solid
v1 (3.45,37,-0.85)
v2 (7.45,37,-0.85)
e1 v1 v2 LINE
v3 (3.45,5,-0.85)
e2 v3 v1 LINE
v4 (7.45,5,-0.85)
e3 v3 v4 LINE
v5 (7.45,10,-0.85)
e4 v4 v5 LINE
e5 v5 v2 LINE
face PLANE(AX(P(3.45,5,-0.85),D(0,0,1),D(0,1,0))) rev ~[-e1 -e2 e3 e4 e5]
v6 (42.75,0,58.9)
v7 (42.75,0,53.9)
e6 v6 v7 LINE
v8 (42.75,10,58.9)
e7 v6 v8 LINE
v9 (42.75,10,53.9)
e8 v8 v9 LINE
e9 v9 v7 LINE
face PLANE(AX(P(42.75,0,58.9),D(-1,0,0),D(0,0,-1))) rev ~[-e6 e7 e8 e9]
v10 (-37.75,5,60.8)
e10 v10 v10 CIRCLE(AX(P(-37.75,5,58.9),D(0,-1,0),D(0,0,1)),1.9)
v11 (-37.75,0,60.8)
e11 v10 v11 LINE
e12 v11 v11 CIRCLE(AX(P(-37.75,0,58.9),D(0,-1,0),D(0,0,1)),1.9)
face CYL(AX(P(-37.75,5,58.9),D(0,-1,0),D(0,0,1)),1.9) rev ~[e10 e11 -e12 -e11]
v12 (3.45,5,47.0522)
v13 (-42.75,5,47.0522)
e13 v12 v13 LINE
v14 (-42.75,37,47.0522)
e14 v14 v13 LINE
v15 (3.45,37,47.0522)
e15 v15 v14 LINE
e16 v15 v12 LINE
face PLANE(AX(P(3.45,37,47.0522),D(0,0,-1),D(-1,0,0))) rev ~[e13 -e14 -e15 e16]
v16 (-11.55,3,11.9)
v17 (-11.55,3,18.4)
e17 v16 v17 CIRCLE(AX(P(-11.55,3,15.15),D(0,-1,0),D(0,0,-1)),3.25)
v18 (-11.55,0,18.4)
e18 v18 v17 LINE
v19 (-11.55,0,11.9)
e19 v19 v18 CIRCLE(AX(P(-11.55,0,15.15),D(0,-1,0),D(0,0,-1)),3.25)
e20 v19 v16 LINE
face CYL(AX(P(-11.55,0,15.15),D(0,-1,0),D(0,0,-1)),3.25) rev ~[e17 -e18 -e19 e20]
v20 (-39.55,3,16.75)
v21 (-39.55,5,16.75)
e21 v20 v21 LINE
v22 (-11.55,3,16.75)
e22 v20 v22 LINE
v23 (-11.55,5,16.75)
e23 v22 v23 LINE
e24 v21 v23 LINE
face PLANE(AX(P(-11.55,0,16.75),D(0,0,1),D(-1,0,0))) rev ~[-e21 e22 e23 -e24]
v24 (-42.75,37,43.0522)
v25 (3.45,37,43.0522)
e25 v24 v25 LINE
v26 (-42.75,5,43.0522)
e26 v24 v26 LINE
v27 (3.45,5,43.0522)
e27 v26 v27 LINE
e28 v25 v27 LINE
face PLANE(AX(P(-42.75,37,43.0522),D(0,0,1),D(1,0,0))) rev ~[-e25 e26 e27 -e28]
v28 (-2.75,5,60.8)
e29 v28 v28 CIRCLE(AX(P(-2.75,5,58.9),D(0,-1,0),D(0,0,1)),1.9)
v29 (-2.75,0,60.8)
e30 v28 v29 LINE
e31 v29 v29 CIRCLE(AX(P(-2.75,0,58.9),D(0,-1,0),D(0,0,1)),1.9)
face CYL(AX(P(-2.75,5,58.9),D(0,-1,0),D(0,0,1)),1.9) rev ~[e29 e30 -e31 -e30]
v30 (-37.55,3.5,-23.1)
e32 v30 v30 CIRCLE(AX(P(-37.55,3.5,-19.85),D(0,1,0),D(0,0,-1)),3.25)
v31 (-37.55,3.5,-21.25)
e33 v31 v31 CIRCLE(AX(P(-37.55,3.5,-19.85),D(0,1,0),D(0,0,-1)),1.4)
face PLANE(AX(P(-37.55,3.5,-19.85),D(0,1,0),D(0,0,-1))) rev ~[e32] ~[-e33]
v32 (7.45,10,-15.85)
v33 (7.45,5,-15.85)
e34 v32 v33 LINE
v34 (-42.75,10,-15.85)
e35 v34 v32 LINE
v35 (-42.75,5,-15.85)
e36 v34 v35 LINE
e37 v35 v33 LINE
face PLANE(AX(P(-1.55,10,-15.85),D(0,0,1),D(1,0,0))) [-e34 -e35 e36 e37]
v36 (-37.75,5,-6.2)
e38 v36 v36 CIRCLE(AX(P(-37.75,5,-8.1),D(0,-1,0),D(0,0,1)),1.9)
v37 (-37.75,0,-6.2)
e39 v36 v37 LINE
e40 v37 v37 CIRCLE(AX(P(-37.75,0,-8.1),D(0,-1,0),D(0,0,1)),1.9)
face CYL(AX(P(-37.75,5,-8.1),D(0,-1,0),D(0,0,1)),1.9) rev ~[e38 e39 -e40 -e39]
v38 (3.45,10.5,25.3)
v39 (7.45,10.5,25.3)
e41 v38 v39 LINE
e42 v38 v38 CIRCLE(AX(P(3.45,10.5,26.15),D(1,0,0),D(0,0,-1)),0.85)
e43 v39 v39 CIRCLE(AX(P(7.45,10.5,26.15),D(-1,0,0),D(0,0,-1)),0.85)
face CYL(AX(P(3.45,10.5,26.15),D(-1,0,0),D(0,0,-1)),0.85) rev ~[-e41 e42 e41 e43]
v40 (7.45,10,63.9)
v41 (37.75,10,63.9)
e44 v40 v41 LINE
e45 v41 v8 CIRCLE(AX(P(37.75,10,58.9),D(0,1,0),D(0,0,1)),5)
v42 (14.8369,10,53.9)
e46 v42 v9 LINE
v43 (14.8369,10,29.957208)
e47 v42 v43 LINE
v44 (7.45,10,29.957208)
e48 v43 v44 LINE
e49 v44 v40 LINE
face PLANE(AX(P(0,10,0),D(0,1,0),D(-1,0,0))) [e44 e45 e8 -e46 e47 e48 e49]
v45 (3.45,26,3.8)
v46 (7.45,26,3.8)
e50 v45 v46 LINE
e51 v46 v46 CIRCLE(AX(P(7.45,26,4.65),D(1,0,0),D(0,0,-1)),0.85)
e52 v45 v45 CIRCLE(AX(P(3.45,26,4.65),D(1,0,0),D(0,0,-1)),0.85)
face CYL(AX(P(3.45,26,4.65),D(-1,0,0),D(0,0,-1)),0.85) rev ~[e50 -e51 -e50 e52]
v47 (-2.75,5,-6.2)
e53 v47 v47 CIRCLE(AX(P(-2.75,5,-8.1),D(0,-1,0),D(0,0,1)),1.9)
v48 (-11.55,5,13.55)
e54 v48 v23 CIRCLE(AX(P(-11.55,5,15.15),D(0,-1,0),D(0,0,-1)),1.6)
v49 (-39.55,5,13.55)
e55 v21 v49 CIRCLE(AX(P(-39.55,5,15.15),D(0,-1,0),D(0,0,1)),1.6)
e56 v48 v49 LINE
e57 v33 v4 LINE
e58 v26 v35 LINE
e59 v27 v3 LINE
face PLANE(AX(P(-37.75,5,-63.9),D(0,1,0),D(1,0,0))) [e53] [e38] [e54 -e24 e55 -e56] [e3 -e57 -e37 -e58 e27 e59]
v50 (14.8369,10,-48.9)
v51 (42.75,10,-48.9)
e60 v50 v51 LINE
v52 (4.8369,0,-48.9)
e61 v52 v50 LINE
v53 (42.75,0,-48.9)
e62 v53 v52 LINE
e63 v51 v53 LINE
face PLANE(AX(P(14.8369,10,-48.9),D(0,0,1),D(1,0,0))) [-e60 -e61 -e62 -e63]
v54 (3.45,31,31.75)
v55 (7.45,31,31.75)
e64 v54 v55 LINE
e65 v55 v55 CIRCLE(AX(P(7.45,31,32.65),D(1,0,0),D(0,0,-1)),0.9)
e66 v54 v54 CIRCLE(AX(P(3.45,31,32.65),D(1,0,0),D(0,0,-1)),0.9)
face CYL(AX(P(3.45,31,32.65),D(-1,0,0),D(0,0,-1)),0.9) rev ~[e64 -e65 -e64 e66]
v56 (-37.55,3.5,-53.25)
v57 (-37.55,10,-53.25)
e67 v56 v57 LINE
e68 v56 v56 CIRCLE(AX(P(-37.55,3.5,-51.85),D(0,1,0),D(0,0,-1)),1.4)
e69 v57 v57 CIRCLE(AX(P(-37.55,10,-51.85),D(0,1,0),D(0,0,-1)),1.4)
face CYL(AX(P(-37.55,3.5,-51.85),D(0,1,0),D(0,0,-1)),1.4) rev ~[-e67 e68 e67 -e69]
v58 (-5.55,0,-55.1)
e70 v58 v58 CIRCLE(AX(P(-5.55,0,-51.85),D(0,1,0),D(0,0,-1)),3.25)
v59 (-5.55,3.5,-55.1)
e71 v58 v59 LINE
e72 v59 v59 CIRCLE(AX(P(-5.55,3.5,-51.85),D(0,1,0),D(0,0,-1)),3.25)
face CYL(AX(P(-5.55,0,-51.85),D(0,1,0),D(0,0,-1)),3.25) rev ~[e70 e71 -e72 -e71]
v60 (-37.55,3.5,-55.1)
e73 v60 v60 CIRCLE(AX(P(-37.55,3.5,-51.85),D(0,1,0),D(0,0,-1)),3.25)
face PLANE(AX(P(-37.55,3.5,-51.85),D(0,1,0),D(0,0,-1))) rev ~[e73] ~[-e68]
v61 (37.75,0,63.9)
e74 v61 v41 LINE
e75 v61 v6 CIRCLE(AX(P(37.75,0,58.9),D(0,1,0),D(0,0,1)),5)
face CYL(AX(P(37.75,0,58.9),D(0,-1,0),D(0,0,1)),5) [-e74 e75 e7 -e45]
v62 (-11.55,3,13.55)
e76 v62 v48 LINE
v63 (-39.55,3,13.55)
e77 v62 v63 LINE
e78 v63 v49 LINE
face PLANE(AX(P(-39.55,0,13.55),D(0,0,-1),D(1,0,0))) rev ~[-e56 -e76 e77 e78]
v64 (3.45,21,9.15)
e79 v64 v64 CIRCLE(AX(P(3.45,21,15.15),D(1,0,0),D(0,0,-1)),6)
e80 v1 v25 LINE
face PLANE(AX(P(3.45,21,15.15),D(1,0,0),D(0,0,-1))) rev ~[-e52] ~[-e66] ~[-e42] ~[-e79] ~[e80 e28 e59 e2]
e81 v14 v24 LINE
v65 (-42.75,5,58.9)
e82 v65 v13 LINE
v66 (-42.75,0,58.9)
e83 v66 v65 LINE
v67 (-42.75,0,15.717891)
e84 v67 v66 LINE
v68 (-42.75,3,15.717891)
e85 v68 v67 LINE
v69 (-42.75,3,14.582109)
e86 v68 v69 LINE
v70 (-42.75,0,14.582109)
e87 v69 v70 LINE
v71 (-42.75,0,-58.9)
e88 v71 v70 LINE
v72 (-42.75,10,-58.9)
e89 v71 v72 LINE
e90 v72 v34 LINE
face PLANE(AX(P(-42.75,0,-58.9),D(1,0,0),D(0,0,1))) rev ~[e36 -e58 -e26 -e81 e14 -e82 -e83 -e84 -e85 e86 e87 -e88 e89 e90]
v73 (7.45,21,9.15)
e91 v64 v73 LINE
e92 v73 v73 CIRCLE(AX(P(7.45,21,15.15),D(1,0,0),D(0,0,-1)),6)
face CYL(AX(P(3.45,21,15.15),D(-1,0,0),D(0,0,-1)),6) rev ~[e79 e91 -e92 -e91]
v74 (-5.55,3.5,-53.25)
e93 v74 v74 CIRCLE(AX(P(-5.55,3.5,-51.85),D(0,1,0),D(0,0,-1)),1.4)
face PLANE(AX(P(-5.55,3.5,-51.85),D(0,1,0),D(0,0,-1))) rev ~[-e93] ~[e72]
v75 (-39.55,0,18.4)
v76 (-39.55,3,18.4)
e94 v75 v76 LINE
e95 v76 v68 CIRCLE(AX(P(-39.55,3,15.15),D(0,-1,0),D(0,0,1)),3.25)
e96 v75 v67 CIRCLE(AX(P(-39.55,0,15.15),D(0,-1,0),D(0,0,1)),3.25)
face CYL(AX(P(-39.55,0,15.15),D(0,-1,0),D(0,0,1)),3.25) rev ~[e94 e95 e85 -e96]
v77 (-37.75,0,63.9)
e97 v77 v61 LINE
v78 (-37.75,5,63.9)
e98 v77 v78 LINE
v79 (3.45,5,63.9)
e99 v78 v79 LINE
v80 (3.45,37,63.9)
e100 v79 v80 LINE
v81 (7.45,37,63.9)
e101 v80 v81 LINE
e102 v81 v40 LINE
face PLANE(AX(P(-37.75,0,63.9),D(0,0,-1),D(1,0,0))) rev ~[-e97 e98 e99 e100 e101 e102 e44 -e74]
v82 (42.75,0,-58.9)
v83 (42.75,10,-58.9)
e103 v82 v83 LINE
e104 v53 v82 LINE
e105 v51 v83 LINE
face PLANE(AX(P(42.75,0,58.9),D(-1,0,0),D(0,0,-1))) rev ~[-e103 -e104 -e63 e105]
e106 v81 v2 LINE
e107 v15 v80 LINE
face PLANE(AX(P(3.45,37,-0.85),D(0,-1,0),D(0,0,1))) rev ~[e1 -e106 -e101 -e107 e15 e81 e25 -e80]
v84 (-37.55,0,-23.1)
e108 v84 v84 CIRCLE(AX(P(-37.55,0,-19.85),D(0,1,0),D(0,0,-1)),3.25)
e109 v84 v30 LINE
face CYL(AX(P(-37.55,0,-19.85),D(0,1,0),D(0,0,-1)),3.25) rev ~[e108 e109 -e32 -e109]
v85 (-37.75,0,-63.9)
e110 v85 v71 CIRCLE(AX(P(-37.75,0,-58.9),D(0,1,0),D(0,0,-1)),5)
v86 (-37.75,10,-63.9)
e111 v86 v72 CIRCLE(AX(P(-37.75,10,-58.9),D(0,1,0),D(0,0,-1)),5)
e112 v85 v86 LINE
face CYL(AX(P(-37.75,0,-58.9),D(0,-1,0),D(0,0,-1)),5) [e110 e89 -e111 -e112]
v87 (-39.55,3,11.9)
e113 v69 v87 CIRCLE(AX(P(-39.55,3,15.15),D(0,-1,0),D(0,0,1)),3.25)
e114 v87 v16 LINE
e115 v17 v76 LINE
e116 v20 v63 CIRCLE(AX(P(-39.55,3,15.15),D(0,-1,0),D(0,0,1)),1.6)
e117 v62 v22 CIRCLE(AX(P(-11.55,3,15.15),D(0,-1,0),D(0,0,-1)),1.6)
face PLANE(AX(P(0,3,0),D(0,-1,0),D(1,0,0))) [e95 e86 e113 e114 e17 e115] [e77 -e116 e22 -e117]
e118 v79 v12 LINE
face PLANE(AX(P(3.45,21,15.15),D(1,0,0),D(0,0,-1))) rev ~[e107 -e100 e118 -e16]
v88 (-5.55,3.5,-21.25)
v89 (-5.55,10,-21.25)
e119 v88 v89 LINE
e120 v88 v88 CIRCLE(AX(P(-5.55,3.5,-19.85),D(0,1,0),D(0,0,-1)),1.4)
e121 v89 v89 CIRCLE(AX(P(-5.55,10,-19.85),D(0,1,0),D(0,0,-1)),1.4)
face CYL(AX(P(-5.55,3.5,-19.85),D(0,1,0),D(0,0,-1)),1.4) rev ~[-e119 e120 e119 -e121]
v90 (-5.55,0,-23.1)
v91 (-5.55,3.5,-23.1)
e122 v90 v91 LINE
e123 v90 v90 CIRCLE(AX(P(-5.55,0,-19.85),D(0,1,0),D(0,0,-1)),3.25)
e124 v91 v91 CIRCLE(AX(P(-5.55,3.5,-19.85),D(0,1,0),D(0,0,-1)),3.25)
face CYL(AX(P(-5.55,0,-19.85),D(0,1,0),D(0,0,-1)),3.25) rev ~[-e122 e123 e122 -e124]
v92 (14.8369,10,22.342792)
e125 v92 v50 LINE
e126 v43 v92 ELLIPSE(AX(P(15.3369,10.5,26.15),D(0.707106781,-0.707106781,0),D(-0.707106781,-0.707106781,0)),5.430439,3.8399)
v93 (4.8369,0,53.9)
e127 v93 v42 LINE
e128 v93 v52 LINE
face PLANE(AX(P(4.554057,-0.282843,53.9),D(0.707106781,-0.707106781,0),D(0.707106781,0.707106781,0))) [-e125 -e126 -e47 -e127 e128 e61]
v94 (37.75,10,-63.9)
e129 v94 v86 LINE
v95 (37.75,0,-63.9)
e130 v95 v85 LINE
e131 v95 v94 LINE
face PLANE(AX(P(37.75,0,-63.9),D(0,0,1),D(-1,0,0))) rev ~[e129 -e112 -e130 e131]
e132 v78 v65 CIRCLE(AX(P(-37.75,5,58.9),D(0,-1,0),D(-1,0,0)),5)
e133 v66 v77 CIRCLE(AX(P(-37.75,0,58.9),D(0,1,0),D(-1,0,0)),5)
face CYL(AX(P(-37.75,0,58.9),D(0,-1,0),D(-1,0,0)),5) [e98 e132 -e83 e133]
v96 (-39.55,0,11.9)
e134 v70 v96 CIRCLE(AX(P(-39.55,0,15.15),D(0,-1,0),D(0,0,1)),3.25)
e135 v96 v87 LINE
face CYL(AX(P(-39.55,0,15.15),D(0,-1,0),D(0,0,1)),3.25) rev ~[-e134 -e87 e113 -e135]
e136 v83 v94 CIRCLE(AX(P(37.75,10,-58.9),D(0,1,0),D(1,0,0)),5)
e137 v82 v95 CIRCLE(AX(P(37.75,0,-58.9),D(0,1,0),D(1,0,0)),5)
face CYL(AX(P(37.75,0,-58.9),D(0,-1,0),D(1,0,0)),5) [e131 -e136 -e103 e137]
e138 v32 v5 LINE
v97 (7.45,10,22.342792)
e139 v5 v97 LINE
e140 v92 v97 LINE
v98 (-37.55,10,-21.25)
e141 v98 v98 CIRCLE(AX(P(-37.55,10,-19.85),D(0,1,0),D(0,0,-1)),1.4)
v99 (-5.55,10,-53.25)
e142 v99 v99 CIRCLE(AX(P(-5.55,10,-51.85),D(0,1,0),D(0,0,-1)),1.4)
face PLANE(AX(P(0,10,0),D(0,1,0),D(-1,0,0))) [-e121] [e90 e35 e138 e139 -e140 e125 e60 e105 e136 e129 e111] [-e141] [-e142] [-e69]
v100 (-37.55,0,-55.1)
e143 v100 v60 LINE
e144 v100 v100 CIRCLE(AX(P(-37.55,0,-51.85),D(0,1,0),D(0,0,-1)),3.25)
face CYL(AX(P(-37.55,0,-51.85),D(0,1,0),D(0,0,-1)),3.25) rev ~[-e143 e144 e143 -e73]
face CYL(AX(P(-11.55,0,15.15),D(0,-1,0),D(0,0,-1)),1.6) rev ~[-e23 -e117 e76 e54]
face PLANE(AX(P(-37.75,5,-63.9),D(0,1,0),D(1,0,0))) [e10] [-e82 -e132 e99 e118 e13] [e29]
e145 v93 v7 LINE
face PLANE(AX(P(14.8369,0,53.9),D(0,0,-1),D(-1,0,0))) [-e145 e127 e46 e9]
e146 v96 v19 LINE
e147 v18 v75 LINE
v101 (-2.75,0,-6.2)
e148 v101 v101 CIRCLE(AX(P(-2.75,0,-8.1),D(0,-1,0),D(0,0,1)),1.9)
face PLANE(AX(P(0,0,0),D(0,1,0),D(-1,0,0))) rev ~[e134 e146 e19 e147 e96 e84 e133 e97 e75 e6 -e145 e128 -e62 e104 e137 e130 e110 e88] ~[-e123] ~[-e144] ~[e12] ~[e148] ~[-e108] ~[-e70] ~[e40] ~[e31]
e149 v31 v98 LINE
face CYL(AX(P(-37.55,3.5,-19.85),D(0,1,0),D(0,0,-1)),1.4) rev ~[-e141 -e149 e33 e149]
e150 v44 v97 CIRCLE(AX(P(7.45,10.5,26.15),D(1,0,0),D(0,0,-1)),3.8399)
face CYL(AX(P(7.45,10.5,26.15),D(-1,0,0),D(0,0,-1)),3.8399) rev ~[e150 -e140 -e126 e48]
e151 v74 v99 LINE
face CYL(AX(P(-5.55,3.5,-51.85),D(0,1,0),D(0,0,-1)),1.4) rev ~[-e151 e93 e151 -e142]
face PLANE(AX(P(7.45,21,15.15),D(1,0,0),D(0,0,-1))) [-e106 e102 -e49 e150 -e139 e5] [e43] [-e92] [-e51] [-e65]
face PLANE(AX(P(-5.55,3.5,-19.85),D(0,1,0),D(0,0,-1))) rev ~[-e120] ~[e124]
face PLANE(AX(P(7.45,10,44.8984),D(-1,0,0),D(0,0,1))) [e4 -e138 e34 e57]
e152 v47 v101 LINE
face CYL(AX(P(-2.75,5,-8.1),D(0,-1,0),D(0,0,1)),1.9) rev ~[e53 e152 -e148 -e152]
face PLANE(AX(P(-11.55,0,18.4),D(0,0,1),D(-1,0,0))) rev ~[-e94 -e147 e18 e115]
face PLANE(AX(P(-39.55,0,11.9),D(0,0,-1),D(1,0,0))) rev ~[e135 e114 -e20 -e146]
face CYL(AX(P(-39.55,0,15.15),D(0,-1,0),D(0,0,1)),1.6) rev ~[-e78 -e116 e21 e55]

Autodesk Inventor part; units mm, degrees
ref_plane "Arbeitsebene4" through (-41.55, 10, -74.35) normal (0, -1, 0) x (1, 0, 0)
sketch "Skizze1" plane through (0, 0, 0) normal (0, 1, 0) x (-1, 0, 0)
  line L0 (-37.75, -63.9) -> (37.75, -63.9)
  line L1 (42.75, -58.9) -> (42.75, 58.9)
  line L2 (37.75, 63.9) -> (-37.75, 63.9)
  line L3 (-42.75, 58.9) -> (-42.75, -58.9)
  line L4 (-42.75, -63.9) -> (42.75, 63.9) construction
  line L5 (42.75, -63.9) -> (-42.75, 63.9) construction
  arc A0 (42.75, 58.9) -> (37.75, 63.9) centre (37.75, 58.9) ccw
  arc A1 (-37.75, 63.9) -> (-42.75, 58.9) centre (-37.75, 58.9) ccw
  arc A2 (-42.75, -58.9) -> (-37.75, -63.9) centre (-37.75, -58.9) ccw
  arc A3 (37.75, -63.9) -> (42.75, -58.9) centre (37.75, -58.9) ccw
  point P0 (0, 0)
  dimension "d0" = 85.5
  dimension "d1" = 127.8
  dimension "d2" = 5
extrude "Extrusion1" add sketch "Skizze1" along normal up to surface (10 mm away)
ref_plane "Arbeitsebene1" through (37.75, 0, 0) normal (0, 0, -1) x (-1, 0, 0)
ref_plane "Arbeitsebene2" through (0, 0, 58.9) normal (1, 0, 0) x (0, 0, -1)
sketch "Skizze10" plane through (0, 0, 0) normal (0, -1, 0) x (1, 0, 0)
  circle A0 centre (-37.55, -51.85) radius 1.75 projected
  circle A1 centre (-37.55, -19.85) radius 1.75 projected
  circle A2 centre (-5.55, -51.85) radius 1.75 projected
  circle A3 centre (-5.55, -19.85) radius 1.75 projected
  circle A4 centre (-37.55, -51.85) radius 1.4
  point P0 (0, 0)
  dimension "d37" = 2.8
hole "Bohrung2" at (-37.55, 0, -51.85) at (-37.55, 0, -19.85) at (-5.55, 0, -19.85) at (-5.55, 0, -51.85) direction (0, 1, 0) diameter 2.8 end through all counterbore diameter 6.5 counterbore depth 3.5
sketch "Skizze11" plane through (-37.75, 10, -63.9) normal (0, 1, 0) x (1, 0, 0)
  line L0 (-6.8, -63.05) -> (41.2, -63.05) projected
  line L1 (-6.8, -95.05) -> (41.2, -95.05) projected
  line L2 (-3.8, -48.05) -> (36.2, -48.05) projected
  line L3 (-5, -5) -> (-5, -122.8) projected
  line L4 (0, -127.8) -> (75.5, -127.8) projected
  line L5 (-5, -48.05) -> (45.2, -48.05)
  line L6 (45.2, -48.05) -> (45.2, -127.8)
  line L7 (45.2, -127.8) -> (-5, -127.8)
  line L8 (-5, -127.8) -> (-5, -48.05)
  line L9 (45.2, -108.7984) -> (45.2, -60.5539)
  line L10 (80.5, -82.3) -> (60.5, -82.3) construction
  line L11 (60.5, -82.3) -> (60.5, -82.05) construction
  line L12 (60.5, -82.05) -> (60.5, -81.8) construction
  line L13 (60.5, -81.8) -> (60.5, -81.55) construction
  line L14 (60.5, -81.55) -> (60.5, -81.3) construction
  line L15 (60.5, -81.3) -> (60.5, -81.05) construction
  line L16 (60.5, -81.05) -> (60.5, -80.8) construction
  line L17 (60.5, -80.8) -> (60.5, -80.55) construction
  line L18 (60.5, -80.55) -> (60.5, -80.3) construction
  line L19 (60.5, -80.3) -> (60.5, -80.05) construction
  line L20 (60.5, -80.05) -> (60.5, -79.8) construction
  line L21 (60.5, -79.8) -> (60.5, -79.55) construction
  line L22 (60.5, -79.55) -> (60.5, -79.3) construction
  line L23 (60.5, -79.3) -> (60.5, -79.05) construction
  line L24 (60.5, -79.05) -> (60.5, -78.8) construction
  line L25 (60.5, -78.8) -> (60.5, -78.55) construction
  line L26 (60.5, -78.55) -> (60.5, -78.3) construction
  line L27 (60.5, -78.3) -> (60.5, -78.05) construction
  line L28 (60.5, -78.05) -> (60.5, -77.8) construction
  line L29 (60.5, -77.8) -> (60.5, -77.55) construction
  line L30 (60.5, -77.55) -> (60.5, -77.3) construction
  line L31 (60.5, -77.3) -> (80.5, -77.3) construction
  line L32 (80.5, -77.3) -> (80.5, -41.8) construction
  line L33 (80.5, -41.8) -> (54.7, -41.8) construction
  line L34 (54.7, -41.8) -> (54.7, -117.8) construction
  line L35 (54.7, -117.8) -> (80.5, -117.8) construction
  line L36 (80.5, -117.8) -> (80.5, -82.3) construction
  point P0 (37.75, -63.9)
  dimension "d45" = 0
ref_plane "Arbeitsebene5" through (-44.55, 5, -0.85) normal (0, -1, 0) x (1, 0, 0)
extrude "Extrusion9" cut sketch "Skizze11" against normal up to surface (5 mm away)
sketch "Skizze12" plane through (0, 0, 0) normal (0, -1, 0) x (1, 0, 0)
  circle A0 centre (-39.55, 15.15) radius 1.4 projected
  circle A1 centre (-11.55, 15.15) radius 1.4 projected
  line L0 (-11.55, 15.15) -> (-39.55, 15.15) construction
  line L1 (-11.55, 16.75) -> (-39.55, 16.75)
  line L2 (-39.55, 13.55) -> (-11.55, 13.55)
  arc A2 (-11.55, 13.55) -> (-11.55, 16.75) centre (-11.55, 15.15) ccw
  arc A3 (-39.55, 16.75) -> (-39.55, 13.55) centre (-39.55, 15.15) ccw
  point P0 (0, 0)
  point P1 (-25.55, 15.15)
  dimension "d48" = 3.2
extrude "Extrusion10" cut sketch "Skizze12" against normal blind 10 contours A0 | A1 | A2 L2 A3 L1
sketch "Skizze13" plane through (0, 0, 0) normal (0, -1, 0) x (1, 0, 0)
  line L0 (-44.55, 31.15) -> (3.45, 31.15) projected
  line L1 (-11.55, 13.55) -> (-39.55, 13.55) projected
  arc A0 (-39.55, 16.75) -> (-39.55, 13.55) centre (-39.55, 15.15) ccw projected
  line L2 (-39.55, 16.75) -> (-11.55, 16.75) projected
  arc A1 (-11.55, 13.55) -> (-11.55, 16.75) centre (-11.55, 15.15) ccw projected
  arc A2 (-42.75, -58.9) -> (-37.75, -63.9) centre (-37.75, -58.9) ccw projected
  line L3 (37.75, -63.9) -> (-37.75, -63.9) projected
  arc A3 (37.75, -63.9) -> (42.75, -58.9) centre (37.75, -58.9) ccw projected
  line L4 (42.75, 58.9) -> (42.75, -58.9) projected
  arc A4 (42.75, 58.9) -> (37.75, 63.9) centre (37.75, 58.9) ccw projected
  line L5 (-37.75, 63.9) -> (37.75, 63.9) projected
  arc A5 (-37.75, 63.9) -> (-42.75, 58.9) centre (-37.75, 58.9) ccw projected
  line L6 (-42.75, -58.9) -> (-42.75, 58.9) projected
  line L7 (-11.55, 18.4) -> (-39.55, 18.4)
  arc A6 (-39.55, 18.4) -> (-39.55, 11.9) centre (-39.55, 15.15) ccw
  line L8 (-39.55, 11.9) -> (-11.55, 11.9)
  arc A7 (-11.55, 11.9) -> (-11.55, 18.4) centre (-11.55, 15.15) ccw
  point P0 (0, 0)
  dimension "d51" = 6.5
extrude "Extrusion11" cut sketch "Skizze13" against normal blind 3 contours L1 A0 L2 A1 | A6 L6 | L6 A6 L7 A7 L8
ref_plane "Arbeitsebene6" through (3.45, 21, 15.15) normal (1, 0, 0) x (0, 0, -1)
sketch "Skizze14" plane through (3.45, 21, 15.15) normal (1, 0, 0) x (0, 0, -1)
  line L0 (16, 16) -> (14, 16) projected
  line L1 (16, -16) -> (16, 16) projected
  line L2 (-16, 16) -> (-16, -16) projected
  circle A0 centre (-17.5, 10) radius 1 construction
  circle A1 centre (-11, -10.5) radius 1 construction
  line L3 (9.4, -16) -> (6.6, -16) projected
  circle A2 centre (10.5, 5) radius 1 construction
  circle A3 centre (0, 0) radius 6 projected
  line L4 (-48.75, -21) -> (-48.75, -11) projected
  line L5 (16, 16) -> (-48.75, 16)
  line L6 (-48.75, 16) -> (-48.75, -16)
  line L7 (-48.75, -16) -> (16, -16)
  line L8 (16, -16) -> (16, 16)
  circle A4 centre (-17.5, 10) radius 0.9
  circle A5 centre (10.5, 5) radius 0.85
  circle A6 centre (-11, -10.5) radius 0.85
  point P0 (15.15, -21)
  point P1 (9.4, -16)
  point P2 (16, -16)
  point P3 (14, 16)
  point P4 (-48.75, -11)
  point P5 (6.6, -16)
  dimension "d56" = 1.8
  dimension "d57" = 1.7
  dimension "d58" = 1.7
ref_plane "Arbeitsebene7" through (7.45, -0.1921, -3.518) normal (-1, 0, 0) x (0, -0.417504, 0.9086751)
extrude "Extrusion12" add sketch "Skizze14" along normal up to surface (4 mm away)
sketch "Skizze15" plane through (-37.75, 10, -63.9) normal (0, 1, 0) x (1, 0, 0)
  line L0 (-5, -48.05) -> (45.2, -48.05) projected
  line L1 (45.2, -48.05) -> (45.2, -63.05) projected
  line L2 (45.2, -63.05) -> (45.2, -89.3626) projected
  line L3 (45.2, -89.3626) -> (45.2, -90.7374) projected
  line L4 (45.2, -90.7374) -> (45.2, -127.8) projected
  line L5 (45.2, -127.8) -> (75.5, -127.8) projected
  arc A0 (75.5, -127.8) -> (80.5, -122.8) centre (75.5, -122.8) ccw projected
  line L6 (80.5, -122.8) -> (80.5, -5) projected
  arc A1 (80.5, -5) -> (75.5, 0) centre (75.5, -5) ccw projected
  line L7 (75.5, 0) -> (0, 0) projected
  arc A2 (0, 0) -> (-5, -5) centre (0, -5) ccw projected
  line L8 (-5, -5) -> (-5, -48.05) projected
  line L9 (80.5, -117.8) -> (52.5869, -117.8)
  line L10 (52.5869, -117.8) -> (52.5869, -15)
  line L11 (52.5869, -15) -> (80.5, -15)
  line L12 (80.5, -15) -> (80.5, -117.8)
  line L13 (45.7, -42.1725) -> (45.7, -1.05)
  point P0 (37.75, -63.9)
  point P1 (80.5, -15)
  dimension "d59" = 10
  dimension "d60" = 15
extrude "Extrusion13" cut sketch "Skizze15" against normal through all contours L6 L9 L10 L11
sketch "Skizze16" plane through (7.45, 10, -0.85) normal (1, 0, 0) x (0, 0, -1)
  circle A0 centre (-27, 0.5) radius 1 projected
  circle A1 centre (-27, 0.5) radius 0.85 projected
  circle A2 centre (-27, 0.5) radius 3.8399
  point P0 (-0.85, -10)
extrude "Extrusion14" cut sketch "Skizze16" along normal up to surface (7.3869 mm away) contours A0 | A1 | A2
chamfer "Fase1" distance 10 angle 45 1 edges at (14.8369, 0, 2.5)
sketch "Skizze17" plane through (-42.75, 5, -15.85) normal (0, 1, 0) x (1, 0, 0)
  line L0 (46.2, -79.75) -> (46.2, -15) projected
  line L1 (46.2, -15) -> (50.2, -15) projected
  line L2 (50.2, -15) -> (50.2, 0) projected
  line L3 (50.2, 0) -> (0, 0) projected
  line L4 (0, -74.75) -> (0, 0) projected
  arc A0 (0, -74.75) -> (5, -79.75) centre (5, -74.75) ccw projected
  line L5 (46.2, -79.75) -> (5, -79.75) projected
  line L6 (3.2, -29.4) -> (31.2, -29.4) projected
  arc A1 (31.2, -32.6) -> (31.2, -29.4) centre (31.2, -31) ccw projected
  line L7 (31.2, -32.6) -> (3.2, -32.6) projected
  arc A2 (3.2, -29.4) -> (3.2, -32.6) centre (3.2, -31) ccw projected
  line L8 (5, -74.75) -> (40, -74.75)
  line L9 (40, -74.75) -> (40, -7.75)
  line L10 (40, -7.75) -> (5, -7.75)
  line L11 (5, -7.75) -> (5, -74.75)
  point P0 (42.75, -15.85)
  dimension "d68" = 35
  dimension "d69" = 67
hole "Bohrung3" at (-37.75, 5, -8.1) at (-2.75, 5, -8.1) at (-2.75, 5, 58.9) at (-37.75, 5, 58.9) direction (0, -1, 0) diameter 3.8 end through all
sketch "Skizze18" plane through (3.45, 37, 63.9) normal (0, 1, 0) x (1, 0, 0)
  line L0 (4, 64.75) -> (4, 0) projected
  line L1 (0, 64.75) -> (4, 64.75) projected
  line L2 (0, 64.75) -> (0, 0) projected
  line L3 (0, 0) -> (4, 0) projected
  line L4 (-46.2, 5) -> (-46.2, 79.75) projected
  line L5 (0, 16.8478) -> (-46.2, 16.8478)
  line L6 (-46.2, 16.8478) -> (-46.2, 20.8478)
  line L7 (-46.2, 20.8478) -> (0, 20.8478)
  line L8 (0, 20.8478) -> (0, 16.8478)
  point P0 (-3.45, 63.9)
  point P1 (0, 20.8478)
  point P2 (-46.2, 16.8478)
  dimension "d77" = 4
extrude "Extrusion15" add sketch "Skizze18" against normal up to surface (32 mm away) contours L2 L5 L4 L7
properties part number "TIRFImager_base_xyz_v0"
